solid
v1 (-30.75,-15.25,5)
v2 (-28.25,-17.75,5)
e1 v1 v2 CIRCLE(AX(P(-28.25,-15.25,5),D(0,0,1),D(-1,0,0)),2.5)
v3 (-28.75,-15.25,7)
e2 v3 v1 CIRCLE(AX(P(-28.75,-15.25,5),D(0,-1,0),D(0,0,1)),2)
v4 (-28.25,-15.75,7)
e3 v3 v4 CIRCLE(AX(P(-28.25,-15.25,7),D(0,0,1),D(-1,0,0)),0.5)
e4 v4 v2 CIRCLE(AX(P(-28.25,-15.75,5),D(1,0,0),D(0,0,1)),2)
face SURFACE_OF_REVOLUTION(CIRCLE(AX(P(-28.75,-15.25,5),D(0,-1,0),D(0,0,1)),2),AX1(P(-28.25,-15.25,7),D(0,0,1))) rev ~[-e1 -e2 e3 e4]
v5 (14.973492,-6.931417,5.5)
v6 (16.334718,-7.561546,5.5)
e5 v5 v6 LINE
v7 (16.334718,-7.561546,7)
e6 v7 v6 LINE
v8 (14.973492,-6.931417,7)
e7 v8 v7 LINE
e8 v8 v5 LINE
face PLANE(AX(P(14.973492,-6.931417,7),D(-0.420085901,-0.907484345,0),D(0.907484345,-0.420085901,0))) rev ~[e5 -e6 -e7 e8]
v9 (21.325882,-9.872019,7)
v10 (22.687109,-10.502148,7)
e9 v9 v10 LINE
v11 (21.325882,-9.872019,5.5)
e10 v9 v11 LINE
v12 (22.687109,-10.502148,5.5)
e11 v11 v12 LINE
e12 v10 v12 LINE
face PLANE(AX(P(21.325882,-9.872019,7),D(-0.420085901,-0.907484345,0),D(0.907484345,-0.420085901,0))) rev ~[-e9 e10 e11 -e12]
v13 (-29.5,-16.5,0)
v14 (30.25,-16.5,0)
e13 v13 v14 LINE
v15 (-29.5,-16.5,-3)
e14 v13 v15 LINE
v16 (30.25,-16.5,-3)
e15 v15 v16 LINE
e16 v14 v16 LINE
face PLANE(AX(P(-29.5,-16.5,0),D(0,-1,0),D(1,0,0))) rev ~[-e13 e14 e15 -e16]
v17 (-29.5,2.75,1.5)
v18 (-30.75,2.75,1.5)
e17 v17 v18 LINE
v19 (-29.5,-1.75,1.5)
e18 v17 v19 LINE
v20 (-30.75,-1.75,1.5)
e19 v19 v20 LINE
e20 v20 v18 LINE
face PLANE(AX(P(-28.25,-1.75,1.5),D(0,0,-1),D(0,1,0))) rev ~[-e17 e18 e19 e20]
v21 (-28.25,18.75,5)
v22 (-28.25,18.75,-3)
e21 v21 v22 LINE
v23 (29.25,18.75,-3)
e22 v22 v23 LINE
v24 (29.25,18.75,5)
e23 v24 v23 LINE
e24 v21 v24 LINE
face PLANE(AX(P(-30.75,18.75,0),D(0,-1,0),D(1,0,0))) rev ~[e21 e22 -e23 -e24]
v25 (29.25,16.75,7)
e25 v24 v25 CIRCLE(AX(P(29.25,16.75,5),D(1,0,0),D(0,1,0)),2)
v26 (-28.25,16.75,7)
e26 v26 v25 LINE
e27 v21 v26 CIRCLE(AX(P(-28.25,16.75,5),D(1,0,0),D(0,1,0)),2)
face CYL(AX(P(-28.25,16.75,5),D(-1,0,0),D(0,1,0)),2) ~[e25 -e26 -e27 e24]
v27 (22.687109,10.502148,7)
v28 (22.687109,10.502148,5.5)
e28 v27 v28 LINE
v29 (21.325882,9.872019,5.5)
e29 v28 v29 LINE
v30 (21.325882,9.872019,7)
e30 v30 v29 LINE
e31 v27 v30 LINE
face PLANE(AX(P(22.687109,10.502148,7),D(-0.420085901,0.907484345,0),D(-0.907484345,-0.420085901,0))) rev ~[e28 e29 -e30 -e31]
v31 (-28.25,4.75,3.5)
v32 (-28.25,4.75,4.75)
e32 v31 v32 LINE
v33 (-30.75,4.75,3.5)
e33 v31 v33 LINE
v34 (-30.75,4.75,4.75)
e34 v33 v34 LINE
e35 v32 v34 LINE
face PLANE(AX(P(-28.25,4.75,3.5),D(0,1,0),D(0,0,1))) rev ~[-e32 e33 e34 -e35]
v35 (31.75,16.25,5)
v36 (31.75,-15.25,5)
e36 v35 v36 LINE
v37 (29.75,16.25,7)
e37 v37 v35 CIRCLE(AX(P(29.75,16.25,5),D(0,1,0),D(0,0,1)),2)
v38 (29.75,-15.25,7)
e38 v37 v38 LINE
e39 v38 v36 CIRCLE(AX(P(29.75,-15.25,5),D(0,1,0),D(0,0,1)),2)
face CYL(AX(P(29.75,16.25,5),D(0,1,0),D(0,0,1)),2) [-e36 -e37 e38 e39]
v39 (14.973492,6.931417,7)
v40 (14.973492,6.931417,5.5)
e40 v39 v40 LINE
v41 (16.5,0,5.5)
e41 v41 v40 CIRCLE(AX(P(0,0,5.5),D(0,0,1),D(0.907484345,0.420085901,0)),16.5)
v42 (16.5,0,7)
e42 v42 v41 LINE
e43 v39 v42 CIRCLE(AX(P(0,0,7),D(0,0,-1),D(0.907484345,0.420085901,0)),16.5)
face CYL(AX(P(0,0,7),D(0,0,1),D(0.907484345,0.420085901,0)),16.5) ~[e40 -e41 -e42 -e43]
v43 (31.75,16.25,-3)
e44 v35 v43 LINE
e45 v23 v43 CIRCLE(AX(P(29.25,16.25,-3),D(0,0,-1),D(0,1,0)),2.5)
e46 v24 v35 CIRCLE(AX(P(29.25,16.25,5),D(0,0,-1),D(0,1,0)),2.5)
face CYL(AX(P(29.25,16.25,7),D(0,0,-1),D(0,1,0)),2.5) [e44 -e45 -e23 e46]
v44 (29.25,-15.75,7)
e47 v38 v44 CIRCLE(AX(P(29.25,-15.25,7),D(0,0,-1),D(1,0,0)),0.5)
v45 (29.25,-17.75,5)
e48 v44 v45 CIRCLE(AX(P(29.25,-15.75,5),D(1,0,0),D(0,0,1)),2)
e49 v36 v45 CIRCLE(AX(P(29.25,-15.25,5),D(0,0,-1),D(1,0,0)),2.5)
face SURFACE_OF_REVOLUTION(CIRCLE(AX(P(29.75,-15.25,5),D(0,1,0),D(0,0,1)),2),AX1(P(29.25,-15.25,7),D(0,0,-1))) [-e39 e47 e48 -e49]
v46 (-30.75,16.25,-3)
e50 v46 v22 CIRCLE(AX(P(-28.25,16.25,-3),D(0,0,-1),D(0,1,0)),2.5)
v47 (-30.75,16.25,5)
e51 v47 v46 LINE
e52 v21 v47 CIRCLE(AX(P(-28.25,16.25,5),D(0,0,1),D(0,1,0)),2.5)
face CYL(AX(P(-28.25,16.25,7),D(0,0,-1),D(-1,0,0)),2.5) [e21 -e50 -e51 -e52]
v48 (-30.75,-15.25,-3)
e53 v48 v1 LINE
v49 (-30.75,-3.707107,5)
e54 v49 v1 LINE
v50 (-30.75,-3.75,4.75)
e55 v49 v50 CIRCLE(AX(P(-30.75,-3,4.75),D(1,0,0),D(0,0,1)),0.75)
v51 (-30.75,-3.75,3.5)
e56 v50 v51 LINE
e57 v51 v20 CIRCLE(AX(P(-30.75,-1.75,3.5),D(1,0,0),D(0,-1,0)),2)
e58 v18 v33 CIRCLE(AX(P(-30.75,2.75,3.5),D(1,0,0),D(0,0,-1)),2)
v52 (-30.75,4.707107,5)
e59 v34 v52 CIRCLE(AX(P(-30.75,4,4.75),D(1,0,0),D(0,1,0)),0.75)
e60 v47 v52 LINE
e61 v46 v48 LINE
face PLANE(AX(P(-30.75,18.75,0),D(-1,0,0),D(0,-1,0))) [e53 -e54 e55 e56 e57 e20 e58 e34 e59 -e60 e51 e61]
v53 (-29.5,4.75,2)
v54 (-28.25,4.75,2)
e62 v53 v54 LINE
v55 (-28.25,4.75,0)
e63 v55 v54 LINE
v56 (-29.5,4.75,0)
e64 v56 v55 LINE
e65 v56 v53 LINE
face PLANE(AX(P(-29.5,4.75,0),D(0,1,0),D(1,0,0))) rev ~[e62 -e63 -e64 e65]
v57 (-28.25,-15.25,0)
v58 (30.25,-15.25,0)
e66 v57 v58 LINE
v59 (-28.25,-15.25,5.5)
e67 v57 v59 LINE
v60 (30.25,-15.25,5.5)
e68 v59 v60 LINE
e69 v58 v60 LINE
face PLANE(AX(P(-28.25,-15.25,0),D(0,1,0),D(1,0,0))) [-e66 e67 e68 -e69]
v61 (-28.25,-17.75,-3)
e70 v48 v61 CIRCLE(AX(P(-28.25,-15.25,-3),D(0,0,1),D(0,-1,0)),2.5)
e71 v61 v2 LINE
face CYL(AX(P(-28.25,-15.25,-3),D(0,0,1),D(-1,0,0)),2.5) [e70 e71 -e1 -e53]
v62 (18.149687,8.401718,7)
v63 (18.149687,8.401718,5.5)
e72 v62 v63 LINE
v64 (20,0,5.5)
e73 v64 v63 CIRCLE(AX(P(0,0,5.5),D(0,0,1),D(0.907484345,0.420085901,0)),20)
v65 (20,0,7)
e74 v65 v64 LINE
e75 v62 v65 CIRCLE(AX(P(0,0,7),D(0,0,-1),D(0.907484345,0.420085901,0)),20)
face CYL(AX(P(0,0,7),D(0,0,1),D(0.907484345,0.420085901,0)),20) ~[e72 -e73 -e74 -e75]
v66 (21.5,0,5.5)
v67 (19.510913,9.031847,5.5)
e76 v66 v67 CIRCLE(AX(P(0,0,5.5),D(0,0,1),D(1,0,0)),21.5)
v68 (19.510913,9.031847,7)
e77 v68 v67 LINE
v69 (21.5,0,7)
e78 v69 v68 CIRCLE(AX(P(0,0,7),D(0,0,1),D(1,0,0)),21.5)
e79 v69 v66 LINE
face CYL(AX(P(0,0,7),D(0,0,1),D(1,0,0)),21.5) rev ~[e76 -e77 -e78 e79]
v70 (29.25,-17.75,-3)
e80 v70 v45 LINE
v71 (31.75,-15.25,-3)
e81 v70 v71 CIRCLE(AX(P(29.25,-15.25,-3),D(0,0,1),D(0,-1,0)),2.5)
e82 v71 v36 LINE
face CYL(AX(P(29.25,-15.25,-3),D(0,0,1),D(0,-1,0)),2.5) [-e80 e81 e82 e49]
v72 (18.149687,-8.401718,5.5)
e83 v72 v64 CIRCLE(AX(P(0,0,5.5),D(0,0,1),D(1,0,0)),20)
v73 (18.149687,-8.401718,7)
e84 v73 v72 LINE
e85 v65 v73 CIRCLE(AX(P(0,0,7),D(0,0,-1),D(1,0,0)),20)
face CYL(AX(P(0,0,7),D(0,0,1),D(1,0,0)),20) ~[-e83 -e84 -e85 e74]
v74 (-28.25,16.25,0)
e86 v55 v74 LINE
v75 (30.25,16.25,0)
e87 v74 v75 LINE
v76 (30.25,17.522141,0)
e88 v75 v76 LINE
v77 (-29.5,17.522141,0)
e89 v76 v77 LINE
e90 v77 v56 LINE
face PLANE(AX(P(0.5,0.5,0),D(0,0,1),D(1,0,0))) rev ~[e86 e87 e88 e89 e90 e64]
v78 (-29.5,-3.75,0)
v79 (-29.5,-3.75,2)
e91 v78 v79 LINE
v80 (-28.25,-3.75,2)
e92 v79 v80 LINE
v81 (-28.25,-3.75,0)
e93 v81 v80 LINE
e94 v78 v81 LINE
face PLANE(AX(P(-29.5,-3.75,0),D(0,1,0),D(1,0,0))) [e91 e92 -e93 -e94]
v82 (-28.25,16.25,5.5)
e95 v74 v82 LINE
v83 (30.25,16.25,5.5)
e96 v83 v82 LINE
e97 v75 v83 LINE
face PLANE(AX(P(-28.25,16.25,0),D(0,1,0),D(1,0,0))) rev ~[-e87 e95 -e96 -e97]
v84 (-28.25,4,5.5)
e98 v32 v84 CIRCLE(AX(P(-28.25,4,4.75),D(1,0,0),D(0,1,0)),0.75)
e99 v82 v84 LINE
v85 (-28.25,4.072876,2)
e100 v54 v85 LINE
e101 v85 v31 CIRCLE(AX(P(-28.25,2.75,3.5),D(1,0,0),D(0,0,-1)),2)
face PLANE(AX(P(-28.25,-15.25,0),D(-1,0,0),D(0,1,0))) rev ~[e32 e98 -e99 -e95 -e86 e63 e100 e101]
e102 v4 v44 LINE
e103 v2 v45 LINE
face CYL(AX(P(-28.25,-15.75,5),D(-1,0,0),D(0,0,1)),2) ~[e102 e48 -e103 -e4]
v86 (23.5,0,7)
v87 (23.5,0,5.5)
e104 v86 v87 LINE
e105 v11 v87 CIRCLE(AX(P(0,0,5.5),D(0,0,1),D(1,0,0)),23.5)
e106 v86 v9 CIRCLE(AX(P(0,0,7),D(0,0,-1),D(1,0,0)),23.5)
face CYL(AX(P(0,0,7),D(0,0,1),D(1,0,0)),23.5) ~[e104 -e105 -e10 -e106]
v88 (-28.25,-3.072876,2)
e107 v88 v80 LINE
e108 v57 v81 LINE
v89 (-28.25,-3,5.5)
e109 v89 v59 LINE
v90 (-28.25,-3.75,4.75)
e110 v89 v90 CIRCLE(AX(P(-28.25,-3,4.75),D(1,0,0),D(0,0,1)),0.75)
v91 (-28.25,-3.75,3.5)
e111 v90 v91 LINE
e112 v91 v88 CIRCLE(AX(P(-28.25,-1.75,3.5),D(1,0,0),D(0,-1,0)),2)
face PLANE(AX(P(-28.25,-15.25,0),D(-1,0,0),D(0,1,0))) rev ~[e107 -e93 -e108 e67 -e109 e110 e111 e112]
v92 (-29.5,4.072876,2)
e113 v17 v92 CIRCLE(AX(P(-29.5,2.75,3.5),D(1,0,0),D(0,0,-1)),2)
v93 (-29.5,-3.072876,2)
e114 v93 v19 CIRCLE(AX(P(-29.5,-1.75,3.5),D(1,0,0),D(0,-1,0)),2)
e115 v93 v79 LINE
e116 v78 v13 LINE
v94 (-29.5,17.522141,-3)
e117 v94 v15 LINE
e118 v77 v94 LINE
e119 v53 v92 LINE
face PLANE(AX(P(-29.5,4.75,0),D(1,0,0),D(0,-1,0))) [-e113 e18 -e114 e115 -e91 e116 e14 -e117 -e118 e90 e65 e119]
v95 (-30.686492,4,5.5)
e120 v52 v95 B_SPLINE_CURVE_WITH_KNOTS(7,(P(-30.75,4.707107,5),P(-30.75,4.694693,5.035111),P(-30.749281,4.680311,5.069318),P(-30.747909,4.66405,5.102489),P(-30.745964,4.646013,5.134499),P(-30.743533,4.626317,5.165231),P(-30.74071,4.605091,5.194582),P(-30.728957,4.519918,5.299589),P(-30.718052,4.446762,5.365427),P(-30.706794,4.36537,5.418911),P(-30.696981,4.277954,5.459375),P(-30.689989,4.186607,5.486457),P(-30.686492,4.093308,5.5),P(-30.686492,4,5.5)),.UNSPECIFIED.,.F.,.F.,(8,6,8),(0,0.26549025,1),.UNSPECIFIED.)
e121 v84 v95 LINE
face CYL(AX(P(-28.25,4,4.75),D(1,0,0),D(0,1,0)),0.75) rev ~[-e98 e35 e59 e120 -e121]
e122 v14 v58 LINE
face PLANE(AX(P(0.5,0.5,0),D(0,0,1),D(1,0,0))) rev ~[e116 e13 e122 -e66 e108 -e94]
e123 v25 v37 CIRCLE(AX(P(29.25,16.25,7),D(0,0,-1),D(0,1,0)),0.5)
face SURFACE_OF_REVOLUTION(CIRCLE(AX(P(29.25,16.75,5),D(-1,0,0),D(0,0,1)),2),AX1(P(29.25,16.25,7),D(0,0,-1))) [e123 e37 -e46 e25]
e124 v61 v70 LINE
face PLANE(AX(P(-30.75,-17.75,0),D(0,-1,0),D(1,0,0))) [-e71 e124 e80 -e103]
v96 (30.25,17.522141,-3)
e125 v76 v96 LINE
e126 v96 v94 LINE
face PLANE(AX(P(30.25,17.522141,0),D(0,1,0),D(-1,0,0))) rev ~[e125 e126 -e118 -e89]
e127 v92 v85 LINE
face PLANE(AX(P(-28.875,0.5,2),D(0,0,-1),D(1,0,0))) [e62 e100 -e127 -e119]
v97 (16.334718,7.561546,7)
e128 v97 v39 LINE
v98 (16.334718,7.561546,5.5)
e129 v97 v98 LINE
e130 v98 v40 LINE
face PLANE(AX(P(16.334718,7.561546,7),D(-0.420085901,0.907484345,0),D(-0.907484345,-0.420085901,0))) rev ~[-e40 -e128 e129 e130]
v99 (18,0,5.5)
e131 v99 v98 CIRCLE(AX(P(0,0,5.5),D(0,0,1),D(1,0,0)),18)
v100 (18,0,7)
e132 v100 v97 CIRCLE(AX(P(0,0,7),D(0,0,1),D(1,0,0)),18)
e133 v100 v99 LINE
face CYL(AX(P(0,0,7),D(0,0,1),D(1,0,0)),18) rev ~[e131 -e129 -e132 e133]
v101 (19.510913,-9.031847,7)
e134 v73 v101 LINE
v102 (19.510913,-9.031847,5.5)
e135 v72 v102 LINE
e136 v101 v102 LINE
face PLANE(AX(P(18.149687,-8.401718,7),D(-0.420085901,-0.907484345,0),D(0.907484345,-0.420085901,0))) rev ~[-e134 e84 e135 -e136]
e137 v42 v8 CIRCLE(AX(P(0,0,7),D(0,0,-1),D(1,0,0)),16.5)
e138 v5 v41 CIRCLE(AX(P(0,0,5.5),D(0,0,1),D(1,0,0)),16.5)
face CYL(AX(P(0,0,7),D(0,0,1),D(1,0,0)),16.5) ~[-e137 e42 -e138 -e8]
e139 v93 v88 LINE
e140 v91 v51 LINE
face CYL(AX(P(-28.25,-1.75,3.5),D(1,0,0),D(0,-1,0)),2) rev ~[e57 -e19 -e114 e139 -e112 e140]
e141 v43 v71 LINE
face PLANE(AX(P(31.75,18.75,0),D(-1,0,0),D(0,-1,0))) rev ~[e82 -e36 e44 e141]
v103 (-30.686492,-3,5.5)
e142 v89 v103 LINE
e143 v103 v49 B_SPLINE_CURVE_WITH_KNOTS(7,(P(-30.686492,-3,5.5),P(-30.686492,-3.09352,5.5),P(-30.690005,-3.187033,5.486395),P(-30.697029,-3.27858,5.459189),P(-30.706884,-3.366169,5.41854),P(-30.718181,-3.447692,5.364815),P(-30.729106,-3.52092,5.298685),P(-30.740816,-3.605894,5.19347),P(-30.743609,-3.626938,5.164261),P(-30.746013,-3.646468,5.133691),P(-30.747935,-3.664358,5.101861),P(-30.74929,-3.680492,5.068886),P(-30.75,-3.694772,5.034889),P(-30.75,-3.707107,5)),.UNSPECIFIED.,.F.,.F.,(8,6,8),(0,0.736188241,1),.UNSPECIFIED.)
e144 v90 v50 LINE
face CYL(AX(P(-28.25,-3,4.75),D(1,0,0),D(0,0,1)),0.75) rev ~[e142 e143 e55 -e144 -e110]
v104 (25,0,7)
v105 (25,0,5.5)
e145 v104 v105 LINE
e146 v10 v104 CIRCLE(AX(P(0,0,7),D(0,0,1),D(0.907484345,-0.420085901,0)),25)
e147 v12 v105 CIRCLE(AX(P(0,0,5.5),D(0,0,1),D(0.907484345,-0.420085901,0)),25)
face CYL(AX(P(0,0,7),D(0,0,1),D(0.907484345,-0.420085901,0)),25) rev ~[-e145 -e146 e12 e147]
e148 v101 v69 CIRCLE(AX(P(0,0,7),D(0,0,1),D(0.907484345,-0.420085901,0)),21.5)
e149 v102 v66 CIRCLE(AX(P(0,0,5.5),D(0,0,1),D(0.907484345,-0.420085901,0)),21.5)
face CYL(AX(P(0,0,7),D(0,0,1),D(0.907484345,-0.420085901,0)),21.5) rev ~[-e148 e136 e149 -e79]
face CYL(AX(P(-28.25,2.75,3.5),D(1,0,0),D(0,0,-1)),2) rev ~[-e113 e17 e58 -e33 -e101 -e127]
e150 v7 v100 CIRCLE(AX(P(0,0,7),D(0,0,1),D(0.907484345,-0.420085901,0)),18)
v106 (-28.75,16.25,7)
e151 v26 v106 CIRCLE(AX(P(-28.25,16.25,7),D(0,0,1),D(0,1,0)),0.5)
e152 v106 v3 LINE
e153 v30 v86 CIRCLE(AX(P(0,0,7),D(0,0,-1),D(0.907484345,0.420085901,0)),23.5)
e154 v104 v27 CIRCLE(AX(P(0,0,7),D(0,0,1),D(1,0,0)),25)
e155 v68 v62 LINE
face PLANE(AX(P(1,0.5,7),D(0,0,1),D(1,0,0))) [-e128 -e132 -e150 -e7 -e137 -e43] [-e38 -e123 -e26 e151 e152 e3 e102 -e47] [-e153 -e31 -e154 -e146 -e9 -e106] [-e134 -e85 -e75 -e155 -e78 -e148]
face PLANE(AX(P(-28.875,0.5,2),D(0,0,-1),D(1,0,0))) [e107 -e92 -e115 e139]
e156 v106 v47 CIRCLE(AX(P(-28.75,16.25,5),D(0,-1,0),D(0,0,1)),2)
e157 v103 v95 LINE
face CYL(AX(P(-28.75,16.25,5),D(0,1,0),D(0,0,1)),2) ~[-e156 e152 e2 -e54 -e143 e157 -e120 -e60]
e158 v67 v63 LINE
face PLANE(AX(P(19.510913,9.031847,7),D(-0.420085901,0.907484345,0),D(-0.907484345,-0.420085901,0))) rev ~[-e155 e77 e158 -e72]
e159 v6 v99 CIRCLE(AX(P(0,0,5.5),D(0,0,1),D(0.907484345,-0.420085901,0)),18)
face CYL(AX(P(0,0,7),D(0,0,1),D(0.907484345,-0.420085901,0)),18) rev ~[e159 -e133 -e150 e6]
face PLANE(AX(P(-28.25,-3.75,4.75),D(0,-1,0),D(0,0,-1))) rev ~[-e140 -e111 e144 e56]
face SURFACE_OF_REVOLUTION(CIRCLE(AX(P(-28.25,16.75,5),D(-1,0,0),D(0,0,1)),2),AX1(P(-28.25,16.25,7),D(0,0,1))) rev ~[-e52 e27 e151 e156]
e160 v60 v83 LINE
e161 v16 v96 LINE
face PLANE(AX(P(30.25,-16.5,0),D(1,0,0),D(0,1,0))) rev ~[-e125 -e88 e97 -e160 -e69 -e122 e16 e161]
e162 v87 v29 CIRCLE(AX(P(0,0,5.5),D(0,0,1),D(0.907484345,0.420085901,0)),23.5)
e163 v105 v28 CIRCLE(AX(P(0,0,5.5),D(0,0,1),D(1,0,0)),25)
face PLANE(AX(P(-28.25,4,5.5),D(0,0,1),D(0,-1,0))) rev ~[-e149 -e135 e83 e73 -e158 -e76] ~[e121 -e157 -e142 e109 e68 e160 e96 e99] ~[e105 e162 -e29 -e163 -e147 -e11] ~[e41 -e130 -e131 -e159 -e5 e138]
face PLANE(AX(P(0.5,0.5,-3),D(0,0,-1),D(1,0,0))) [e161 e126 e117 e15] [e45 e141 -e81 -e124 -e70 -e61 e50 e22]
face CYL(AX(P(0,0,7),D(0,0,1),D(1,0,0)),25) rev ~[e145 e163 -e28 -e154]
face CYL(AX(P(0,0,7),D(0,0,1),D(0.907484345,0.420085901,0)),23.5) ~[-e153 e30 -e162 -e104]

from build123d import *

# Parameters (mm, degrees)
F0_W         = 62.5
F0_H         = 36.5
F0_W_2       = 58.5
F0_H_2       = 31.5
F1_DEPTH     = 7
F3_DEPTH     = 1.5
F4_W         = 62.5
F4_H         = 36.5
F5_DEPTH     = 3
F7_DEPTH     = 2.5
F8_R         = 2.5
F9_T1_DEPTH  = 57.5
F9_T3_DEPTH  = 31.5
F9_T6_ANGLE  = 90
F9_T8_ANGLE  = 90
F9_T10_ANGLE = 90
F9_T12_ANGLE = 90
F10_W        = 1.25
F10_H        = 8.5
F11_DEPTH    = 2
F13_DEPTH    = 3


# Not quite as in the source:
# - a fillet or chamfer that OpenCascade refuses, or shapes differently, is made with other operations: its cross-section is extruded or revolved along the edge and cut away or added
# - a feature names something its author has since deleted; it is built from what else it names


with BuildPart() as f1:
    # F0 (on Top) → F1 (new body)
    with BuildSketch(Plane.XY):
        with Locations((0.5, 0.5)):
            Rectangle(F0_W, F0_H)
        with Locations((1, 0.5)):
            Rectangle(F0_W_2, F0_H_2, mode=Mode.SUBTRACT)
    extrude(amount=F1_DEPTH)

    # F2 (on face) → F3 (join)
    with BuildSketch(Plane.XY.offset(7)):
        Polygon((30.25, 16.25), (-28.25, 16.25), (-28.25, -15.25), (30.25, -15.25), (30.25, -6), (30.25, 7), align=None)
    extrude(amount=-F3_DEPTH)

    # F4 (on face) → F5 (join)
    with BuildSketch(Plane(origin=(0, 0, 0), x_dir=(1, 0, 0), z_dir=(0, 0, -1))):
        with Locations((0.5, -0.5)):
            Rectangle(F4_W, F4_H)
        Polygon((-29.5, -17.522141248), (-29.5, 16.5), (30.25, 16.5), (30.25, 15.25), (30.25, -16.25), (30.25, -17.522141248), align=None, mode=Mode.SUBTRACT)
    extrude(amount=F5_DEPTH)

    # F6 (on face) → F7 (cut)
    with BuildSketch(Plane.YZ.offset(-28.25)):
        with BuildLine():
            Line((4, 5.5), (-3, 5.5))
            ThreePointArc((-3, 5.5), (-3.5303300859, 5.2803300859), (-3.75, 4.75))
            Line((-3.75, 4.75), (-3.75, 3.5))
            ThreePointArc((-3.75, 3.5), (-3.1642135624, 2.0857864376), (-1.75, 1.5))
            Line((-1.75, 1.5), (2.75, 1.5))
            ThreePointArc((2.75, 1.5), (4.1642135624, 2.0857864376), (4.75, 3.5))
            Line((4.75, 3.5), (4.75, 4.75))
            ThreePointArc((4.75, 4.75), (4.5303300859, 5.2803300859), (4, 5.5))
        make_face()
    extrude(amount=-F7_DEPTH, mode=Mode.SUBTRACT)

    # F8
    f8_edges = [f1.edges().sort_by_distance(p)[0] for p in [
        (-30.75, 18.75, 2),
        (-30.75, -17.75, 2),
        (31.75, 18.75, 2),
        (31.75, -17.75, 2),
    ]]
    fillet(f8_edges, radius=F8_R)

    # F9: fillet of radius 2 on 8 edges, made by hand

    # F9_s2 → F9_t1 (cut)
    with BuildSketch(Plane.YZ.offset(-28.25)):
        with BuildLine():
            ThreePointArc((18.75, 5), (18.1642135624, 6.4142135624), (16.75, 7))
            Line((16.75, 7), (18.75, 7))
            Line((18.75, 7), (18.75, 5))
        make_face()
        with BuildLine():
            ThreePointArc((-15.75, 7), (-17.1642135624, 6.4142135624), (-17.75, 5))
            Line((-17.75, 5), (-17.75, 7))
            Line((-17.75, 7), (-15.75, 7))
        make_face()
    extrude(amount=F9_T1_DEPTH, mode=Mode.SUBTRACT)

    # F9_s4 → F9_t3 (cut)
    with BuildSketch(Plane.XZ.offset(-16.25)):
        with BuildLine():
            ThreePointArc((29.75, 7), (31.1642135624, 6.4142135624), (31.75, 5))
            Line((31.75, 5), (31.75, 7))
            Line((31.75, 7), (29.75, 7))
        make_face()
        with BuildLine():
            ThreePointArc((-28.75, 7), (-30.1642135624, 6.4142135624), (-30.75, 5))
            Line((-30.75, 5), (-30.75, 7))
            Line((-30.75, 7), (-28.75, 7))
        make_face()
    extrude(amount=F9_T3_DEPTH, mode=Mode.SUBTRACT)

    # F9_s5 → F9_t6 (revolve, cut)
    with BuildSketch(Plane.YZ.offset(29.25)):
        with BuildLine():
            ThreePointArc((16.75, 7), (18.1642135624, 6.4142135624), (18.75, 5))
            Line((18.75, 5), (18.75, 7))
            Line((18.75, 7), (16.75, 7))
        make_face()
    revolve(axis=Axis((29.25, 16.25, 7), (0, 0, -1)), revolution_arc=F9_T6_ANGLE, mode=Mode.SUBTRACT)

    # F9_s7 → F9_t8 (revolve, cut)
    with BuildSketch(Plane.YZ.offset(-28.25)):
        with BuildLine():
            ThreePointArc((16.75, 7), (18.1642135624, 6.4142135624), (18.75, 5))
            Line((18.75, 5), (18.75, 7))
            Line((18.75, 7), (16.75, 7))
        make_face()
    revolve(axis=Axis((-28.25, 16.25, 7), (0, 0, 1)), revolution_arc=F9_T8_ANGLE, mode=Mode.SUBTRACT)

    # F9_s9 → F9_t10 (revolve, cut)
    with BuildSketch(Plane.XZ.offset(15.25)):
        with BuildLine():
            ThreePointArc((29.75, 7), (31.1642135624, 6.4142135624), (31.75, 5))
            Line((31.75, 5), (31.75, 7))
            Line((31.75, 7), (29.75, 7))
        make_face()
    revolve(axis=Axis((29.25, -15.25, 7), (0, 0, -1)), revolution_arc=F9_T10_ANGLE, mode=Mode.SUBTRACT)

    # F9_s11 → F9_t12 (revolve, cut)
    with BuildSketch(Plane.XZ.offset(15.25)):
        with BuildLine():
            ThreePointArc((-28.75, 7), (-30.1642135624, 6.4142135624), (-30.75, 5))
            Line((-30.75, 5), (-30.75, 7))
            Line((-30.75, 7), (-28.75, 7))
        make_face()
    revolve(axis=Axis((-28.25, -15.25, 7), (0, 0, 1)), revolution_arc=F9_T12_ANGLE, mode=Mode.SUBTRACT)

    # F10 (on face) → F11 (cut)
    with BuildSketch(Plane(origin=(0, 0, 0), x_dir=(1, 0, 0), z_dir=(0, 0, -1))):
        with Locations((-28.875, -0.5)):
            Rectangle(F10_W, F10_H)
    extrude(amount=-F11_DEPTH, mode=Mode.SUBTRACT)

    # F12 (on face) → F13 (cut)
    with BuildSketch(Plane.XY.offset(7)):
        with BuildLine():
            ThreePointArc((22.6871086181, -10.5021475209), (24.4149310408, -5.3769082449), (25, 0))
            ThreePointArc((25, 0), (24.4149310408, 5.3769082449), (22.6871086181, 10.5021475209))
            Line((22.6871086181, 10.5021475209), (21.325882101, 9.8720186697))
            ThreePointArc((21.325882101, 9.8720186697), (22.9500351783, 5.0542937502), (23.5, 0))
            ThreePointArc((23.5, 0), (22.9500351783, -5.0542937502), (21.325882101, -9.8720186697))
            Line((21.325882101, -9.8720186697), (22.6871086181, -10.5021475209))
        make_face()
        with BuildLine():
            ThreePointArc((19.5109134115, -9.031846868), (20.9968406951, -4.6241410906), (21.5, 0))
            ThreePointArc((21.5, 0), (20.9968406951, 4.6241410906), (19.5109134115, 9.031846868))
            Line((19.5109134115, 9.031846868), (18.1496868945, 8.4017180168))
            ThreePointArc((18.1496868945, 8.4017180168), (19.5319448326, 4.3015265959), (20, 0))
            ThreePointArc((20, 0), (19.5319448326, -4.3015265959), (18.1496868945, -8.4017180168))
            Line((18.1496868945, -8.4017180168), (19.5109134115, -9.031846868))
        make_face()
        with BuildLine():
            ThreePointArc((16.334718205, -7.5615462151), (17.5787503494, -3.8713739363), (18, 0))
            ThreePointArc((18, 0), (17.5787503494, 3.8713739363), (16.334718205, 7.5615462151))
            Line((16.334718205, 7.5615462151), (14.9734916879, 6.9314173638))
            ThreePointArc((14.9734916879, 6.9314173638), (16.1138544869, 3.5487594416), (16.5, 0))
            ThreePointArc((16.5, 0), (16.1138544869, -3.5487594416), (14.9734916879, -6.9314173638))
            Line((14.9734916879, -6.9314173638), (16.334718205, -7.5615462151))
        make_face()
    extrude(amount=-F13_DEPTH, mode=Mode.SUBTRACT)


solid = f1.part
